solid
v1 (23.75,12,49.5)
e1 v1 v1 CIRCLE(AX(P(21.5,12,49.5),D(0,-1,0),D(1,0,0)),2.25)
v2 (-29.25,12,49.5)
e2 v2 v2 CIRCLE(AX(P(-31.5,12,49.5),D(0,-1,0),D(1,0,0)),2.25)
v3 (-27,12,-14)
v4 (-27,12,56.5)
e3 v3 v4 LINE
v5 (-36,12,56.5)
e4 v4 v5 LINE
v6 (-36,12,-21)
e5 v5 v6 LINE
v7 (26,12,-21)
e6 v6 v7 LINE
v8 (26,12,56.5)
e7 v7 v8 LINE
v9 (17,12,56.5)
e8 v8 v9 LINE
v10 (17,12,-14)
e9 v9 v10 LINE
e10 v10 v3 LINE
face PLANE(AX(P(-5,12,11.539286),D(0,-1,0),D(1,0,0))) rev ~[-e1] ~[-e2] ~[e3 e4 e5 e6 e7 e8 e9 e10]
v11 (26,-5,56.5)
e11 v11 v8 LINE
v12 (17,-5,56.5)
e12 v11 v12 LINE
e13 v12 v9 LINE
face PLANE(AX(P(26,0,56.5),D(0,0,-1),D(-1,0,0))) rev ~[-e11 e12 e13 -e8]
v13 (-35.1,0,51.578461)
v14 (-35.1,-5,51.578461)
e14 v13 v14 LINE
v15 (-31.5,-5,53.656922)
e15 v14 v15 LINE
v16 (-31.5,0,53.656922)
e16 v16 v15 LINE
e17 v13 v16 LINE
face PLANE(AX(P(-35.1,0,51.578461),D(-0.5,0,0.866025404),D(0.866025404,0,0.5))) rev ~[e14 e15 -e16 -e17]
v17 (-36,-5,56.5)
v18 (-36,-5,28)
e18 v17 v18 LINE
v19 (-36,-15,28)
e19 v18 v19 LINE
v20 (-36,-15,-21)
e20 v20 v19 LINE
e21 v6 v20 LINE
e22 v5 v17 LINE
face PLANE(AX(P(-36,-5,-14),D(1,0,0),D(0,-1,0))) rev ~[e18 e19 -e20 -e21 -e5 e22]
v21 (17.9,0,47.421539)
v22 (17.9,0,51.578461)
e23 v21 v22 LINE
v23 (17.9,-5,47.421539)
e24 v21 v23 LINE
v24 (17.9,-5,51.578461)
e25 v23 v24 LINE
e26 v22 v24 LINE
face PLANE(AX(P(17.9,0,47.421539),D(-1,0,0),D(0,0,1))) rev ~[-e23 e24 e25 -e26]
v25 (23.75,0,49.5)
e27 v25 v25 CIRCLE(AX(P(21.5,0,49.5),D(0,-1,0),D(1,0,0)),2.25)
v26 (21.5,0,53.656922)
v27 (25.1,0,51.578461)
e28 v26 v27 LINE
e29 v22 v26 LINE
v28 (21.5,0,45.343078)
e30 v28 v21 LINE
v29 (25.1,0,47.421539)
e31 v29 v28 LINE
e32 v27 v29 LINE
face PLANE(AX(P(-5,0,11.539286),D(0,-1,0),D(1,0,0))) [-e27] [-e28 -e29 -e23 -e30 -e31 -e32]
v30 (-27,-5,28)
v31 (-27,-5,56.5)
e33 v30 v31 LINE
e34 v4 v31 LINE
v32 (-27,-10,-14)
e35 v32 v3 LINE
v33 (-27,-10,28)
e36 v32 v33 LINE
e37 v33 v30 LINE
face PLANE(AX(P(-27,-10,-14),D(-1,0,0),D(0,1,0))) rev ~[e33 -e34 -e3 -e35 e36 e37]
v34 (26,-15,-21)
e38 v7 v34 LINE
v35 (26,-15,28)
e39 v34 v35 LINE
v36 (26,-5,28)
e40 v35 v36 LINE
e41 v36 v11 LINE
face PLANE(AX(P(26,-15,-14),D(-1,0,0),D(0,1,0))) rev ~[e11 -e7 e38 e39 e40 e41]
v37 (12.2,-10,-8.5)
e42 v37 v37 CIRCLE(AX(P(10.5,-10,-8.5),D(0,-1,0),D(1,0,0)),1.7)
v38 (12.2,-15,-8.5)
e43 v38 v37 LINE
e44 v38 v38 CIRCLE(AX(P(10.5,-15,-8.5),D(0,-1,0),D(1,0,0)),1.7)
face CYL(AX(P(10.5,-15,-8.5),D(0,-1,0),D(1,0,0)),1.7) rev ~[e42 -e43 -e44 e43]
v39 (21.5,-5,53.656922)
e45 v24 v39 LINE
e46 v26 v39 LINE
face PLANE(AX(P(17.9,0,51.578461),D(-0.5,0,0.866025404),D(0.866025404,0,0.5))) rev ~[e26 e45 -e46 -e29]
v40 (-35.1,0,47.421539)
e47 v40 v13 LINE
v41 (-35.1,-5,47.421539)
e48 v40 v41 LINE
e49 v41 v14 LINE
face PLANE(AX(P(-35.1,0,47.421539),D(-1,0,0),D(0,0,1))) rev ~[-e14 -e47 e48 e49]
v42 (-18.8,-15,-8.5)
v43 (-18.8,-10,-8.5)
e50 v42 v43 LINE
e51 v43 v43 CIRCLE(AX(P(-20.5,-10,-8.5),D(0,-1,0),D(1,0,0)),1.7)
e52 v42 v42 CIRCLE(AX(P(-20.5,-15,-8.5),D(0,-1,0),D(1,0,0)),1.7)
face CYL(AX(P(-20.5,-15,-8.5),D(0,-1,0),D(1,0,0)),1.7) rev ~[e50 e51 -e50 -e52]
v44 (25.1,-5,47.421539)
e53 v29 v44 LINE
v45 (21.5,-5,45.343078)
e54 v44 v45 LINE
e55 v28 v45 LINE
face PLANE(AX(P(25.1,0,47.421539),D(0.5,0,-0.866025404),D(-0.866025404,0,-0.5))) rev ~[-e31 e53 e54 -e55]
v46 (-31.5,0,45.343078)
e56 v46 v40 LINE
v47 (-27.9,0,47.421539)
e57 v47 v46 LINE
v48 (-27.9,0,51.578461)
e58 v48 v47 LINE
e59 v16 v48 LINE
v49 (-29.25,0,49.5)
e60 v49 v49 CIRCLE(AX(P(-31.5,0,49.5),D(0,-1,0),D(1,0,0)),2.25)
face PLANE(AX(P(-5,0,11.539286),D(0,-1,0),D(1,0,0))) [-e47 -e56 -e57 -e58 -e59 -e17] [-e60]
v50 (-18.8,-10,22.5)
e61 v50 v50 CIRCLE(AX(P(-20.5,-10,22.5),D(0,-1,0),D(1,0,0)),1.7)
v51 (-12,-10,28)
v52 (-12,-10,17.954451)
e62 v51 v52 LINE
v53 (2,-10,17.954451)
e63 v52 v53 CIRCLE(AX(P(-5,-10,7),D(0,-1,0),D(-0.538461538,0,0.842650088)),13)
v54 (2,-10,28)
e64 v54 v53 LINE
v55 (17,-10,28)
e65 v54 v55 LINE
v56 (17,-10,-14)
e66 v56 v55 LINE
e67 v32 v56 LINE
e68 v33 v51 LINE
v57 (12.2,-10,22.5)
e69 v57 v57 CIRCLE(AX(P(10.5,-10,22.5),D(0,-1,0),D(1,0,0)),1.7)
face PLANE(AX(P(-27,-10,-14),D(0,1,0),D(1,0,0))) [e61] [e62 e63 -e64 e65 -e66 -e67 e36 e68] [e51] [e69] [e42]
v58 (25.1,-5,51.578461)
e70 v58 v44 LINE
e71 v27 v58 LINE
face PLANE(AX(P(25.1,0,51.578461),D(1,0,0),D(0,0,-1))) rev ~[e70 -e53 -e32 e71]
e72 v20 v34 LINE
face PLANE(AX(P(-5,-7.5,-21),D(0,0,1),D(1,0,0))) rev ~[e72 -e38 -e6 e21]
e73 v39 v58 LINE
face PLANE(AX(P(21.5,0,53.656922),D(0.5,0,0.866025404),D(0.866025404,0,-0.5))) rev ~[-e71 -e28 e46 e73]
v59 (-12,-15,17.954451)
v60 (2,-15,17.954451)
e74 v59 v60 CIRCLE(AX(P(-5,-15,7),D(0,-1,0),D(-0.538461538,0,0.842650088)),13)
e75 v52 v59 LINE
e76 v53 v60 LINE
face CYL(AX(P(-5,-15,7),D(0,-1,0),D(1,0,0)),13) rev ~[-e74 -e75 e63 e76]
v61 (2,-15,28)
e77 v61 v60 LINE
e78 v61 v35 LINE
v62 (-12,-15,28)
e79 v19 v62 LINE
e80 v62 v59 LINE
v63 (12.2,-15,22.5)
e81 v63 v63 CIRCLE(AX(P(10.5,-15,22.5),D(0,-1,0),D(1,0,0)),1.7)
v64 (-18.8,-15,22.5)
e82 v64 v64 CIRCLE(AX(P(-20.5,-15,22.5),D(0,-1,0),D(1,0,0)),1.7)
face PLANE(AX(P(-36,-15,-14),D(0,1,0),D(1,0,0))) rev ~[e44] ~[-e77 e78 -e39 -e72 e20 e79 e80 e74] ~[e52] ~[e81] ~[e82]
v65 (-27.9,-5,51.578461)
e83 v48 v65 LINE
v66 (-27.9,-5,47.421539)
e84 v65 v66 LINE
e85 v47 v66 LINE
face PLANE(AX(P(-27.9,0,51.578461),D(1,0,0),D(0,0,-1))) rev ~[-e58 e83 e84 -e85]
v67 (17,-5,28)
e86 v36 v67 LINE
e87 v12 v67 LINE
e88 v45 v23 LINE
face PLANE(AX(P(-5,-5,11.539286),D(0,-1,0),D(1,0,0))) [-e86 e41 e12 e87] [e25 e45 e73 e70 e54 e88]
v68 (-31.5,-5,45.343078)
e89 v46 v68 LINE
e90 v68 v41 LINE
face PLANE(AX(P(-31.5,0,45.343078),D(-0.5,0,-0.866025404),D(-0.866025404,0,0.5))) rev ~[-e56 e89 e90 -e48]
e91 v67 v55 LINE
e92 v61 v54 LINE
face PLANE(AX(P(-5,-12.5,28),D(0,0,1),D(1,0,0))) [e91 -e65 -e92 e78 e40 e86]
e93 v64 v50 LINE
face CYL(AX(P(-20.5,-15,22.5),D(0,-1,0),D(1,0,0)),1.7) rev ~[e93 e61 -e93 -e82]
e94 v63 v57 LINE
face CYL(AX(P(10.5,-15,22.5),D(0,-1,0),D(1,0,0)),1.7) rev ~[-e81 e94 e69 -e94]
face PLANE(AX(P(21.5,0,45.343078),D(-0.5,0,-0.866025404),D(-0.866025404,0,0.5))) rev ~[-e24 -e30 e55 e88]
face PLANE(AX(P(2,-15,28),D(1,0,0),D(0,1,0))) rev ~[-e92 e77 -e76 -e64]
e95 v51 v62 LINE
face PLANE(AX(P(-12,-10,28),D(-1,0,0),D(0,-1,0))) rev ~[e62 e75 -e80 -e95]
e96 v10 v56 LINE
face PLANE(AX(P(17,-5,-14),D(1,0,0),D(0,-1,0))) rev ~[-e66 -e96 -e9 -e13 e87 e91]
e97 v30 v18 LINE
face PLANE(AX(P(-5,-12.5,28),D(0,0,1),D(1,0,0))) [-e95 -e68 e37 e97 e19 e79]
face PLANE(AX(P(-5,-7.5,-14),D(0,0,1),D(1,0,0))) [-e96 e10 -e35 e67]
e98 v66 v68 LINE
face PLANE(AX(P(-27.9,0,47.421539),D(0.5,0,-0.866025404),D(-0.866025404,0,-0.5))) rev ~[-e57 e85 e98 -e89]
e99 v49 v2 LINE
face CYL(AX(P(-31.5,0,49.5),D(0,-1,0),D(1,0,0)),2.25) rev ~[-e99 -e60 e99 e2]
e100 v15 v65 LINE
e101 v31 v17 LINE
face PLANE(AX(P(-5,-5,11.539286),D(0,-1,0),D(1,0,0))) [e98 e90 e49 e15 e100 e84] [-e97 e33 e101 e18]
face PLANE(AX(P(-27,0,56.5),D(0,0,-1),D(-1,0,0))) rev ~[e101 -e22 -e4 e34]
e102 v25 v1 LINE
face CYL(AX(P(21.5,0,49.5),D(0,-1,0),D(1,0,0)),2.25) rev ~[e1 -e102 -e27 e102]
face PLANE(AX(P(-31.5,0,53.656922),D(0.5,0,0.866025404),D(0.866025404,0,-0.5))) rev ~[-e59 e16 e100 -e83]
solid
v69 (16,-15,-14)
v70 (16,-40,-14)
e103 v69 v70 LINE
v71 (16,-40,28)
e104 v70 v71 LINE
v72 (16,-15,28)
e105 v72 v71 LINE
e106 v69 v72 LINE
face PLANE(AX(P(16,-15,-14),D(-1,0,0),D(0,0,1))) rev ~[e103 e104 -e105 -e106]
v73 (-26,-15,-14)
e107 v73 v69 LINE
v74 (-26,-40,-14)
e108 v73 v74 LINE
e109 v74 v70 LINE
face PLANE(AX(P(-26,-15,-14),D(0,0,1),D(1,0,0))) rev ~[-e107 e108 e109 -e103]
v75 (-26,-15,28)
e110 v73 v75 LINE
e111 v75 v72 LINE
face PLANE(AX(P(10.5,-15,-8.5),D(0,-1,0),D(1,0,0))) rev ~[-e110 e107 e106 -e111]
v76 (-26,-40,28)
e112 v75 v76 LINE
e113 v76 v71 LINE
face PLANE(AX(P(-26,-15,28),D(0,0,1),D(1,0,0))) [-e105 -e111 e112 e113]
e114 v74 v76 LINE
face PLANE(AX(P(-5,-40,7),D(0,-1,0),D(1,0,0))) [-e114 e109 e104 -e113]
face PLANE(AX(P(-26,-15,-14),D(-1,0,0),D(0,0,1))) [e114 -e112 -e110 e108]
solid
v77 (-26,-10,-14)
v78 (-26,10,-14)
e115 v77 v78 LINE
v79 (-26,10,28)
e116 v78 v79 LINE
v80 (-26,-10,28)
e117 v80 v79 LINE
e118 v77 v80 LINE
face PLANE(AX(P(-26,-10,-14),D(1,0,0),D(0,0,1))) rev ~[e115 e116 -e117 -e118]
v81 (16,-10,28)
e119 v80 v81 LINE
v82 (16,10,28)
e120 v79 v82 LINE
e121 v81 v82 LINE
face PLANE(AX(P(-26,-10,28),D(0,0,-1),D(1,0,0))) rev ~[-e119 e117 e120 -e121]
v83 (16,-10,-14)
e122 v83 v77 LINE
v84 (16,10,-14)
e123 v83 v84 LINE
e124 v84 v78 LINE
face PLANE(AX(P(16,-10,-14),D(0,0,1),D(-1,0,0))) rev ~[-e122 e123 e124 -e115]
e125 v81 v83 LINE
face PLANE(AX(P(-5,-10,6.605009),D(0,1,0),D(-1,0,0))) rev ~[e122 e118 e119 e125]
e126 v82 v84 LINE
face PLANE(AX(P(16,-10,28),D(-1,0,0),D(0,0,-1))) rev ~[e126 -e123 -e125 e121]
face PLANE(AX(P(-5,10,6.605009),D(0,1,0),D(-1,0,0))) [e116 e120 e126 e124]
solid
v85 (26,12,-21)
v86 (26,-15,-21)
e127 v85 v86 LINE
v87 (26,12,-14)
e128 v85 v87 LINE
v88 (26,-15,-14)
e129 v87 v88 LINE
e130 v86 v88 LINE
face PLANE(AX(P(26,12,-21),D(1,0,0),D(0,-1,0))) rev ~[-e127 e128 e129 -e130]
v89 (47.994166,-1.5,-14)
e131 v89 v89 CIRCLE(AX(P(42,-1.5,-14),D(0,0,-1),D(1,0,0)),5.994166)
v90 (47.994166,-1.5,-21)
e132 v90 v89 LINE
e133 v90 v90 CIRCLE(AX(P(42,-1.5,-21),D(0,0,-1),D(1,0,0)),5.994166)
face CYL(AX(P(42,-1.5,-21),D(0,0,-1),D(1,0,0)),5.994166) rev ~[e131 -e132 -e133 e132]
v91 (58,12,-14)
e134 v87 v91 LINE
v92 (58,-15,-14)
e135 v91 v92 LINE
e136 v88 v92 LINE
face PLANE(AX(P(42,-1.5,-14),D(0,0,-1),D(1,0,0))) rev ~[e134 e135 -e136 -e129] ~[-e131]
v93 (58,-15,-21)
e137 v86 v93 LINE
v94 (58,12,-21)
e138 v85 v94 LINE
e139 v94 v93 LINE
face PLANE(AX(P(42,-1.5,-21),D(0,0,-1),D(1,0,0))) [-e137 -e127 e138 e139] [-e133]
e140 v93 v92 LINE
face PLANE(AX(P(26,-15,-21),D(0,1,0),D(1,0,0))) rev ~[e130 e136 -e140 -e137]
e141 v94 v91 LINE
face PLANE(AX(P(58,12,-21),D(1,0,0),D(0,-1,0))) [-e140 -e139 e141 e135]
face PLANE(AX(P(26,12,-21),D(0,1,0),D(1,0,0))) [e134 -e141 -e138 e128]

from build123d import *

# Parameters (mm, degrees)
F1_R      = 2.25
F2_DEPTH  = 12
F4_DEPTH  = 5
F5_W      = 44
F5_H      = 5
F6_DEPTH  = 7
F7_DEPTH  = 42
F8_R      = 1.7
F8_R_2    = 13
F9_DEPTH  = 5
F11_REACH = 63.8670687473
F12_R     = 1.7
F13_DEPTH = 20
F14_W     = 42
F14_H     = 42
F14_R     = 1.7
F14_R_2   = 13
F15_DEPTH = 25
F16_W     = 32
F16_H     = 27
F16_R     = 5.9941661127
F17_DEPTH = 7


with BuildPart() as f2:
    # F1 (on Front) → F2 (new body)
    with BuildSketch(Plane.XZ):
        Polygon((-27, 56.5), (-36, 56.5), (-36, -21), (26, -21), (26, 56.5), (17, 56.5), (17, -14), (-27, -14), align=None)
        with Locations((-31.5, 49.5)):
            Circle(F1_R, mode=Mode.SUBTRACT)
        with Locations((21.5, 49.5)):
            Circle(F1_R, mode=Mode.SUBTRACT)
    extrude(amount=-F2_DEPTH)

    # F3 (on face) → F4 (join)
    with BuildSketch(Plane.XZ):
        Polygon((-27, -14), (-27, 56.5), (-36, 56.5), (-36, -21), (26, -21), (26, 56.5), (17, 56.5), (17, -14), align=None)
        Polygon((-31.5, 53.6569219382), (-27.9, 51.5784609691), (-27.9, 47.4215390309), (-31.5, 45.3430780618), (-35.1, 47.4215390309), (-35.1, 51.5784609691), align=None, mode=Mode.SUBTRACT)
        Polygon((21.5, 53.6569219382), (25.1, 51.5784609691), (25.1, 47.4215390309), (21.5, 45.3430780618), (17.9, 47.4215390309), (17.9, 51.5784609691), align=None, mode=Mode.SUBTRACT)
    extrude(amount=F4_DEPTH)

    # F5 (on face) → F6 (join, through all)
    with BuildSketch(Plane.XY.offset(-14)):
        with Locations((-5, -7.5)):
            Rectangle(F5_W, F5_H)
        with Locations((-5, -12.5)):
            Rectangle(F5_W, F5_H)
        Polygon((-27, -10), (-27, -5), (-36, -5), (-36, -15), (-27, -15), align=None)
        Polygon((26, -5), (17, -5), (17, -10), (17, -15), (26, -15), align=None)
    extrude(amount=-F6_DEPTH)

    # F5 (on face) → F7 (join)
    with BuildSketch(Plane.XY.offset(-14)):
        with Locations((-5, -12.5)):
            Rectangle(F5_W, F5_H)
        Polygon((-27, -10), (-27, -5), (-36, -5), (-36, -15), (-27, -15), align=None)
        Polygon((26, -5), (17, -5), (17, -10), (17, -15), (26, -15), align=None)
    extrude(amount=F7_DEPTH)

    # F8 (on face) → F9 (cut, through all)
    with BuildSketch(Plane.XZ.offset(15)):
        with Locations((-20.5, 22.5)):
            Circle(F8_R)
        with Locations((-5, 7)):
            Circle(F8_R_2)
        with Locations((-20.5, -8.5)):
            Circle(F8_R)
        with Locations((10.5, -8.5)):
            Circle(F8_R)
        with Locations((10.5, 22.5)):
            Circle(F8_R)
    extrude(amount=-F9_DEPTH, mode=Mode.SUBTRACT)

    f11_end = f2.faces().sort_by_distance((-18, -12.5, 7))[0]
    # F10 (on face) → F11 (cut, up to a face of the model that its end follows)
    with BuildSketch(Plane.XY.offset(28)):
        Polygon((2, -10), (-5, -10), (-12, -10), (-12, -15), (2, -15), align=None)
    f11_long = extrude(amount=-F11_REACH, mode=Mode.PRIVATE)
    add(split(f11_long, bisect_by=f11_end, keep=Keep.ALL, mode=Mode.PRIVATE).solids().sort_by_distance((-5, -12.5, 28))[0], mode=Mode.SUBTRACT)


with BuildPart() as f13:
    # F12 (on face) → F13 (new body)
    with BuildSketch(Plane(origin=(0, -10, 0), x_dir=(-1, 0, 0), z_dir=(0, 1, 0))):
        with BuildLine():
            Line((-16, -14), (26, -14))
            Line((26, -14), (26, 28))
            Line((26, 28), (12, 28))
            Line((12, 28), (12, 17.9544511501))
            ThreePointArc((12, 17.9544511501), (5, -6), (-2, 17.9544511501))
            Line((-2, 17.9544511501), (-2, 28))
            Line((-2, 28), (-16, 28))
            Line((-16, 28), (-16, -14))
        make_face()
        with Locations((-10.5, -8.5)):
            Circle(F12_R, mode=Mode.SUBTRACT)
        with Locations((20.5, -8.5)):
            Circle(F12_R, mode=Mode.SUBTRACT)
        with Locations((-10.5, 22.5)):
            Circle(F12_R, mode=Mode.SUBTRACT)
        with Locations((20.5, 22.5)):
            Circle(F12_R, mode=Mode.SUBTRACT)
        with BuildLine():
            Line((12, 17.9544511501), (12, 28))
            Line((12, 28), (-2, 28))
            Line((-2, 28), (-2, 17.9544511501))
            ThreePointArc((-2, 17.9544511501), (5, -6), (12, 17.9544511501))
        make_face()
        with Locations((-10.5, 22.5)):
            Circle(F12_R)
        with Locations((20.5, 22.5)):
            Circle(F12_R)
        with Locations((-10.5, -8.5)):
            Circle(F12_R)
        with Locations((20.5, -8.5)):
            Circle(F12_R)
    extrude(amount=F13_DEPTH)


with BuildPart() as f15:
    # F14 (on face) → F15 (new body)
    with BuildSketch(Plane.XZ.offset(15)):
        with Locations((-5, 7)):
            Rectangle(F14_W, F14_H)
        with Locations((-20.5, -8.5)):
            Circle(F14_R, mode=Mode.SUBTRACT)
        with Locations((10.5, -8.5)):
            Circle(F14_R, mode=Mode.SUBTRACT)
        with Locations((-20.5, 22.5)):
            Circle(F14_R, mode=Mode.SUBTRACT)
        with Locations((-5, 7)):
            Circle(F14_R_2, mode=Mode.SUBTRACT)
        with Locations((10.5, 22.5)):
            Circle(F14_R, mode=Mode.SUBTRACT)
    extrude(amount=F15_DEPTH)

    # F8 (on face) → F15, piece 2 (join)
    with BuildSketch(Plane.XZ.offset(15)):
        with Locations((-20.5, 22.5)):
            Circle(F8_R)
    extrude(amount=F15_DEPTH)

    # F8 (on face) → F15, piece 3 (join)
    with BuildSketch(Plane.XZ.offset(15)):
        with Locations((-5, 7)):
            Circle(F8_R_2)
    extrude(amount=F15_DEPTH)

    # F8 (on face) → F15, piece 4 (join)
    with BuildSketch(Plane.XZ.offset(15)):
        with Locations((-20.5, -8.5)):
            Circle(F8_R)
    extrude(amount=F15_DEPTH)

    # F8 (on face) → F15, piece 5 (join)
    with BuildSketch(Plane.XZ.offset(15)):
        with Locations((10.5, 22.5)):
            Circle(F8_R)
    extrude(amount=F15_DEPTH)

    # F8 (on face) → F15, piece 6 (join)
    with BuildSketch(Plane.XZ.offset(15)):
        with Locations((10.5, -8.5)):
            Circle(F8_R)
    extrude(amount=F15_DEPTH)


with BuildPart() as f17:
    # F16 (on face) → F17 (new body, through all)
    with BuildSketch(Plane(origin=(0, 0, -21), x_dir=(1, 0, 0), z_dir=(0, 0, -1))):
        with Locations((42, 1.5)):
            Rectangle(F16_W, F16_H)
        with Locations((42, 1.5)):
            Circle(F16_R, mode=Mode.SUBTRACT)
    extrude(amount=-F17_DEPTH)


solid = Compound([f2.part, f13.part, f15.part, f17.part])
